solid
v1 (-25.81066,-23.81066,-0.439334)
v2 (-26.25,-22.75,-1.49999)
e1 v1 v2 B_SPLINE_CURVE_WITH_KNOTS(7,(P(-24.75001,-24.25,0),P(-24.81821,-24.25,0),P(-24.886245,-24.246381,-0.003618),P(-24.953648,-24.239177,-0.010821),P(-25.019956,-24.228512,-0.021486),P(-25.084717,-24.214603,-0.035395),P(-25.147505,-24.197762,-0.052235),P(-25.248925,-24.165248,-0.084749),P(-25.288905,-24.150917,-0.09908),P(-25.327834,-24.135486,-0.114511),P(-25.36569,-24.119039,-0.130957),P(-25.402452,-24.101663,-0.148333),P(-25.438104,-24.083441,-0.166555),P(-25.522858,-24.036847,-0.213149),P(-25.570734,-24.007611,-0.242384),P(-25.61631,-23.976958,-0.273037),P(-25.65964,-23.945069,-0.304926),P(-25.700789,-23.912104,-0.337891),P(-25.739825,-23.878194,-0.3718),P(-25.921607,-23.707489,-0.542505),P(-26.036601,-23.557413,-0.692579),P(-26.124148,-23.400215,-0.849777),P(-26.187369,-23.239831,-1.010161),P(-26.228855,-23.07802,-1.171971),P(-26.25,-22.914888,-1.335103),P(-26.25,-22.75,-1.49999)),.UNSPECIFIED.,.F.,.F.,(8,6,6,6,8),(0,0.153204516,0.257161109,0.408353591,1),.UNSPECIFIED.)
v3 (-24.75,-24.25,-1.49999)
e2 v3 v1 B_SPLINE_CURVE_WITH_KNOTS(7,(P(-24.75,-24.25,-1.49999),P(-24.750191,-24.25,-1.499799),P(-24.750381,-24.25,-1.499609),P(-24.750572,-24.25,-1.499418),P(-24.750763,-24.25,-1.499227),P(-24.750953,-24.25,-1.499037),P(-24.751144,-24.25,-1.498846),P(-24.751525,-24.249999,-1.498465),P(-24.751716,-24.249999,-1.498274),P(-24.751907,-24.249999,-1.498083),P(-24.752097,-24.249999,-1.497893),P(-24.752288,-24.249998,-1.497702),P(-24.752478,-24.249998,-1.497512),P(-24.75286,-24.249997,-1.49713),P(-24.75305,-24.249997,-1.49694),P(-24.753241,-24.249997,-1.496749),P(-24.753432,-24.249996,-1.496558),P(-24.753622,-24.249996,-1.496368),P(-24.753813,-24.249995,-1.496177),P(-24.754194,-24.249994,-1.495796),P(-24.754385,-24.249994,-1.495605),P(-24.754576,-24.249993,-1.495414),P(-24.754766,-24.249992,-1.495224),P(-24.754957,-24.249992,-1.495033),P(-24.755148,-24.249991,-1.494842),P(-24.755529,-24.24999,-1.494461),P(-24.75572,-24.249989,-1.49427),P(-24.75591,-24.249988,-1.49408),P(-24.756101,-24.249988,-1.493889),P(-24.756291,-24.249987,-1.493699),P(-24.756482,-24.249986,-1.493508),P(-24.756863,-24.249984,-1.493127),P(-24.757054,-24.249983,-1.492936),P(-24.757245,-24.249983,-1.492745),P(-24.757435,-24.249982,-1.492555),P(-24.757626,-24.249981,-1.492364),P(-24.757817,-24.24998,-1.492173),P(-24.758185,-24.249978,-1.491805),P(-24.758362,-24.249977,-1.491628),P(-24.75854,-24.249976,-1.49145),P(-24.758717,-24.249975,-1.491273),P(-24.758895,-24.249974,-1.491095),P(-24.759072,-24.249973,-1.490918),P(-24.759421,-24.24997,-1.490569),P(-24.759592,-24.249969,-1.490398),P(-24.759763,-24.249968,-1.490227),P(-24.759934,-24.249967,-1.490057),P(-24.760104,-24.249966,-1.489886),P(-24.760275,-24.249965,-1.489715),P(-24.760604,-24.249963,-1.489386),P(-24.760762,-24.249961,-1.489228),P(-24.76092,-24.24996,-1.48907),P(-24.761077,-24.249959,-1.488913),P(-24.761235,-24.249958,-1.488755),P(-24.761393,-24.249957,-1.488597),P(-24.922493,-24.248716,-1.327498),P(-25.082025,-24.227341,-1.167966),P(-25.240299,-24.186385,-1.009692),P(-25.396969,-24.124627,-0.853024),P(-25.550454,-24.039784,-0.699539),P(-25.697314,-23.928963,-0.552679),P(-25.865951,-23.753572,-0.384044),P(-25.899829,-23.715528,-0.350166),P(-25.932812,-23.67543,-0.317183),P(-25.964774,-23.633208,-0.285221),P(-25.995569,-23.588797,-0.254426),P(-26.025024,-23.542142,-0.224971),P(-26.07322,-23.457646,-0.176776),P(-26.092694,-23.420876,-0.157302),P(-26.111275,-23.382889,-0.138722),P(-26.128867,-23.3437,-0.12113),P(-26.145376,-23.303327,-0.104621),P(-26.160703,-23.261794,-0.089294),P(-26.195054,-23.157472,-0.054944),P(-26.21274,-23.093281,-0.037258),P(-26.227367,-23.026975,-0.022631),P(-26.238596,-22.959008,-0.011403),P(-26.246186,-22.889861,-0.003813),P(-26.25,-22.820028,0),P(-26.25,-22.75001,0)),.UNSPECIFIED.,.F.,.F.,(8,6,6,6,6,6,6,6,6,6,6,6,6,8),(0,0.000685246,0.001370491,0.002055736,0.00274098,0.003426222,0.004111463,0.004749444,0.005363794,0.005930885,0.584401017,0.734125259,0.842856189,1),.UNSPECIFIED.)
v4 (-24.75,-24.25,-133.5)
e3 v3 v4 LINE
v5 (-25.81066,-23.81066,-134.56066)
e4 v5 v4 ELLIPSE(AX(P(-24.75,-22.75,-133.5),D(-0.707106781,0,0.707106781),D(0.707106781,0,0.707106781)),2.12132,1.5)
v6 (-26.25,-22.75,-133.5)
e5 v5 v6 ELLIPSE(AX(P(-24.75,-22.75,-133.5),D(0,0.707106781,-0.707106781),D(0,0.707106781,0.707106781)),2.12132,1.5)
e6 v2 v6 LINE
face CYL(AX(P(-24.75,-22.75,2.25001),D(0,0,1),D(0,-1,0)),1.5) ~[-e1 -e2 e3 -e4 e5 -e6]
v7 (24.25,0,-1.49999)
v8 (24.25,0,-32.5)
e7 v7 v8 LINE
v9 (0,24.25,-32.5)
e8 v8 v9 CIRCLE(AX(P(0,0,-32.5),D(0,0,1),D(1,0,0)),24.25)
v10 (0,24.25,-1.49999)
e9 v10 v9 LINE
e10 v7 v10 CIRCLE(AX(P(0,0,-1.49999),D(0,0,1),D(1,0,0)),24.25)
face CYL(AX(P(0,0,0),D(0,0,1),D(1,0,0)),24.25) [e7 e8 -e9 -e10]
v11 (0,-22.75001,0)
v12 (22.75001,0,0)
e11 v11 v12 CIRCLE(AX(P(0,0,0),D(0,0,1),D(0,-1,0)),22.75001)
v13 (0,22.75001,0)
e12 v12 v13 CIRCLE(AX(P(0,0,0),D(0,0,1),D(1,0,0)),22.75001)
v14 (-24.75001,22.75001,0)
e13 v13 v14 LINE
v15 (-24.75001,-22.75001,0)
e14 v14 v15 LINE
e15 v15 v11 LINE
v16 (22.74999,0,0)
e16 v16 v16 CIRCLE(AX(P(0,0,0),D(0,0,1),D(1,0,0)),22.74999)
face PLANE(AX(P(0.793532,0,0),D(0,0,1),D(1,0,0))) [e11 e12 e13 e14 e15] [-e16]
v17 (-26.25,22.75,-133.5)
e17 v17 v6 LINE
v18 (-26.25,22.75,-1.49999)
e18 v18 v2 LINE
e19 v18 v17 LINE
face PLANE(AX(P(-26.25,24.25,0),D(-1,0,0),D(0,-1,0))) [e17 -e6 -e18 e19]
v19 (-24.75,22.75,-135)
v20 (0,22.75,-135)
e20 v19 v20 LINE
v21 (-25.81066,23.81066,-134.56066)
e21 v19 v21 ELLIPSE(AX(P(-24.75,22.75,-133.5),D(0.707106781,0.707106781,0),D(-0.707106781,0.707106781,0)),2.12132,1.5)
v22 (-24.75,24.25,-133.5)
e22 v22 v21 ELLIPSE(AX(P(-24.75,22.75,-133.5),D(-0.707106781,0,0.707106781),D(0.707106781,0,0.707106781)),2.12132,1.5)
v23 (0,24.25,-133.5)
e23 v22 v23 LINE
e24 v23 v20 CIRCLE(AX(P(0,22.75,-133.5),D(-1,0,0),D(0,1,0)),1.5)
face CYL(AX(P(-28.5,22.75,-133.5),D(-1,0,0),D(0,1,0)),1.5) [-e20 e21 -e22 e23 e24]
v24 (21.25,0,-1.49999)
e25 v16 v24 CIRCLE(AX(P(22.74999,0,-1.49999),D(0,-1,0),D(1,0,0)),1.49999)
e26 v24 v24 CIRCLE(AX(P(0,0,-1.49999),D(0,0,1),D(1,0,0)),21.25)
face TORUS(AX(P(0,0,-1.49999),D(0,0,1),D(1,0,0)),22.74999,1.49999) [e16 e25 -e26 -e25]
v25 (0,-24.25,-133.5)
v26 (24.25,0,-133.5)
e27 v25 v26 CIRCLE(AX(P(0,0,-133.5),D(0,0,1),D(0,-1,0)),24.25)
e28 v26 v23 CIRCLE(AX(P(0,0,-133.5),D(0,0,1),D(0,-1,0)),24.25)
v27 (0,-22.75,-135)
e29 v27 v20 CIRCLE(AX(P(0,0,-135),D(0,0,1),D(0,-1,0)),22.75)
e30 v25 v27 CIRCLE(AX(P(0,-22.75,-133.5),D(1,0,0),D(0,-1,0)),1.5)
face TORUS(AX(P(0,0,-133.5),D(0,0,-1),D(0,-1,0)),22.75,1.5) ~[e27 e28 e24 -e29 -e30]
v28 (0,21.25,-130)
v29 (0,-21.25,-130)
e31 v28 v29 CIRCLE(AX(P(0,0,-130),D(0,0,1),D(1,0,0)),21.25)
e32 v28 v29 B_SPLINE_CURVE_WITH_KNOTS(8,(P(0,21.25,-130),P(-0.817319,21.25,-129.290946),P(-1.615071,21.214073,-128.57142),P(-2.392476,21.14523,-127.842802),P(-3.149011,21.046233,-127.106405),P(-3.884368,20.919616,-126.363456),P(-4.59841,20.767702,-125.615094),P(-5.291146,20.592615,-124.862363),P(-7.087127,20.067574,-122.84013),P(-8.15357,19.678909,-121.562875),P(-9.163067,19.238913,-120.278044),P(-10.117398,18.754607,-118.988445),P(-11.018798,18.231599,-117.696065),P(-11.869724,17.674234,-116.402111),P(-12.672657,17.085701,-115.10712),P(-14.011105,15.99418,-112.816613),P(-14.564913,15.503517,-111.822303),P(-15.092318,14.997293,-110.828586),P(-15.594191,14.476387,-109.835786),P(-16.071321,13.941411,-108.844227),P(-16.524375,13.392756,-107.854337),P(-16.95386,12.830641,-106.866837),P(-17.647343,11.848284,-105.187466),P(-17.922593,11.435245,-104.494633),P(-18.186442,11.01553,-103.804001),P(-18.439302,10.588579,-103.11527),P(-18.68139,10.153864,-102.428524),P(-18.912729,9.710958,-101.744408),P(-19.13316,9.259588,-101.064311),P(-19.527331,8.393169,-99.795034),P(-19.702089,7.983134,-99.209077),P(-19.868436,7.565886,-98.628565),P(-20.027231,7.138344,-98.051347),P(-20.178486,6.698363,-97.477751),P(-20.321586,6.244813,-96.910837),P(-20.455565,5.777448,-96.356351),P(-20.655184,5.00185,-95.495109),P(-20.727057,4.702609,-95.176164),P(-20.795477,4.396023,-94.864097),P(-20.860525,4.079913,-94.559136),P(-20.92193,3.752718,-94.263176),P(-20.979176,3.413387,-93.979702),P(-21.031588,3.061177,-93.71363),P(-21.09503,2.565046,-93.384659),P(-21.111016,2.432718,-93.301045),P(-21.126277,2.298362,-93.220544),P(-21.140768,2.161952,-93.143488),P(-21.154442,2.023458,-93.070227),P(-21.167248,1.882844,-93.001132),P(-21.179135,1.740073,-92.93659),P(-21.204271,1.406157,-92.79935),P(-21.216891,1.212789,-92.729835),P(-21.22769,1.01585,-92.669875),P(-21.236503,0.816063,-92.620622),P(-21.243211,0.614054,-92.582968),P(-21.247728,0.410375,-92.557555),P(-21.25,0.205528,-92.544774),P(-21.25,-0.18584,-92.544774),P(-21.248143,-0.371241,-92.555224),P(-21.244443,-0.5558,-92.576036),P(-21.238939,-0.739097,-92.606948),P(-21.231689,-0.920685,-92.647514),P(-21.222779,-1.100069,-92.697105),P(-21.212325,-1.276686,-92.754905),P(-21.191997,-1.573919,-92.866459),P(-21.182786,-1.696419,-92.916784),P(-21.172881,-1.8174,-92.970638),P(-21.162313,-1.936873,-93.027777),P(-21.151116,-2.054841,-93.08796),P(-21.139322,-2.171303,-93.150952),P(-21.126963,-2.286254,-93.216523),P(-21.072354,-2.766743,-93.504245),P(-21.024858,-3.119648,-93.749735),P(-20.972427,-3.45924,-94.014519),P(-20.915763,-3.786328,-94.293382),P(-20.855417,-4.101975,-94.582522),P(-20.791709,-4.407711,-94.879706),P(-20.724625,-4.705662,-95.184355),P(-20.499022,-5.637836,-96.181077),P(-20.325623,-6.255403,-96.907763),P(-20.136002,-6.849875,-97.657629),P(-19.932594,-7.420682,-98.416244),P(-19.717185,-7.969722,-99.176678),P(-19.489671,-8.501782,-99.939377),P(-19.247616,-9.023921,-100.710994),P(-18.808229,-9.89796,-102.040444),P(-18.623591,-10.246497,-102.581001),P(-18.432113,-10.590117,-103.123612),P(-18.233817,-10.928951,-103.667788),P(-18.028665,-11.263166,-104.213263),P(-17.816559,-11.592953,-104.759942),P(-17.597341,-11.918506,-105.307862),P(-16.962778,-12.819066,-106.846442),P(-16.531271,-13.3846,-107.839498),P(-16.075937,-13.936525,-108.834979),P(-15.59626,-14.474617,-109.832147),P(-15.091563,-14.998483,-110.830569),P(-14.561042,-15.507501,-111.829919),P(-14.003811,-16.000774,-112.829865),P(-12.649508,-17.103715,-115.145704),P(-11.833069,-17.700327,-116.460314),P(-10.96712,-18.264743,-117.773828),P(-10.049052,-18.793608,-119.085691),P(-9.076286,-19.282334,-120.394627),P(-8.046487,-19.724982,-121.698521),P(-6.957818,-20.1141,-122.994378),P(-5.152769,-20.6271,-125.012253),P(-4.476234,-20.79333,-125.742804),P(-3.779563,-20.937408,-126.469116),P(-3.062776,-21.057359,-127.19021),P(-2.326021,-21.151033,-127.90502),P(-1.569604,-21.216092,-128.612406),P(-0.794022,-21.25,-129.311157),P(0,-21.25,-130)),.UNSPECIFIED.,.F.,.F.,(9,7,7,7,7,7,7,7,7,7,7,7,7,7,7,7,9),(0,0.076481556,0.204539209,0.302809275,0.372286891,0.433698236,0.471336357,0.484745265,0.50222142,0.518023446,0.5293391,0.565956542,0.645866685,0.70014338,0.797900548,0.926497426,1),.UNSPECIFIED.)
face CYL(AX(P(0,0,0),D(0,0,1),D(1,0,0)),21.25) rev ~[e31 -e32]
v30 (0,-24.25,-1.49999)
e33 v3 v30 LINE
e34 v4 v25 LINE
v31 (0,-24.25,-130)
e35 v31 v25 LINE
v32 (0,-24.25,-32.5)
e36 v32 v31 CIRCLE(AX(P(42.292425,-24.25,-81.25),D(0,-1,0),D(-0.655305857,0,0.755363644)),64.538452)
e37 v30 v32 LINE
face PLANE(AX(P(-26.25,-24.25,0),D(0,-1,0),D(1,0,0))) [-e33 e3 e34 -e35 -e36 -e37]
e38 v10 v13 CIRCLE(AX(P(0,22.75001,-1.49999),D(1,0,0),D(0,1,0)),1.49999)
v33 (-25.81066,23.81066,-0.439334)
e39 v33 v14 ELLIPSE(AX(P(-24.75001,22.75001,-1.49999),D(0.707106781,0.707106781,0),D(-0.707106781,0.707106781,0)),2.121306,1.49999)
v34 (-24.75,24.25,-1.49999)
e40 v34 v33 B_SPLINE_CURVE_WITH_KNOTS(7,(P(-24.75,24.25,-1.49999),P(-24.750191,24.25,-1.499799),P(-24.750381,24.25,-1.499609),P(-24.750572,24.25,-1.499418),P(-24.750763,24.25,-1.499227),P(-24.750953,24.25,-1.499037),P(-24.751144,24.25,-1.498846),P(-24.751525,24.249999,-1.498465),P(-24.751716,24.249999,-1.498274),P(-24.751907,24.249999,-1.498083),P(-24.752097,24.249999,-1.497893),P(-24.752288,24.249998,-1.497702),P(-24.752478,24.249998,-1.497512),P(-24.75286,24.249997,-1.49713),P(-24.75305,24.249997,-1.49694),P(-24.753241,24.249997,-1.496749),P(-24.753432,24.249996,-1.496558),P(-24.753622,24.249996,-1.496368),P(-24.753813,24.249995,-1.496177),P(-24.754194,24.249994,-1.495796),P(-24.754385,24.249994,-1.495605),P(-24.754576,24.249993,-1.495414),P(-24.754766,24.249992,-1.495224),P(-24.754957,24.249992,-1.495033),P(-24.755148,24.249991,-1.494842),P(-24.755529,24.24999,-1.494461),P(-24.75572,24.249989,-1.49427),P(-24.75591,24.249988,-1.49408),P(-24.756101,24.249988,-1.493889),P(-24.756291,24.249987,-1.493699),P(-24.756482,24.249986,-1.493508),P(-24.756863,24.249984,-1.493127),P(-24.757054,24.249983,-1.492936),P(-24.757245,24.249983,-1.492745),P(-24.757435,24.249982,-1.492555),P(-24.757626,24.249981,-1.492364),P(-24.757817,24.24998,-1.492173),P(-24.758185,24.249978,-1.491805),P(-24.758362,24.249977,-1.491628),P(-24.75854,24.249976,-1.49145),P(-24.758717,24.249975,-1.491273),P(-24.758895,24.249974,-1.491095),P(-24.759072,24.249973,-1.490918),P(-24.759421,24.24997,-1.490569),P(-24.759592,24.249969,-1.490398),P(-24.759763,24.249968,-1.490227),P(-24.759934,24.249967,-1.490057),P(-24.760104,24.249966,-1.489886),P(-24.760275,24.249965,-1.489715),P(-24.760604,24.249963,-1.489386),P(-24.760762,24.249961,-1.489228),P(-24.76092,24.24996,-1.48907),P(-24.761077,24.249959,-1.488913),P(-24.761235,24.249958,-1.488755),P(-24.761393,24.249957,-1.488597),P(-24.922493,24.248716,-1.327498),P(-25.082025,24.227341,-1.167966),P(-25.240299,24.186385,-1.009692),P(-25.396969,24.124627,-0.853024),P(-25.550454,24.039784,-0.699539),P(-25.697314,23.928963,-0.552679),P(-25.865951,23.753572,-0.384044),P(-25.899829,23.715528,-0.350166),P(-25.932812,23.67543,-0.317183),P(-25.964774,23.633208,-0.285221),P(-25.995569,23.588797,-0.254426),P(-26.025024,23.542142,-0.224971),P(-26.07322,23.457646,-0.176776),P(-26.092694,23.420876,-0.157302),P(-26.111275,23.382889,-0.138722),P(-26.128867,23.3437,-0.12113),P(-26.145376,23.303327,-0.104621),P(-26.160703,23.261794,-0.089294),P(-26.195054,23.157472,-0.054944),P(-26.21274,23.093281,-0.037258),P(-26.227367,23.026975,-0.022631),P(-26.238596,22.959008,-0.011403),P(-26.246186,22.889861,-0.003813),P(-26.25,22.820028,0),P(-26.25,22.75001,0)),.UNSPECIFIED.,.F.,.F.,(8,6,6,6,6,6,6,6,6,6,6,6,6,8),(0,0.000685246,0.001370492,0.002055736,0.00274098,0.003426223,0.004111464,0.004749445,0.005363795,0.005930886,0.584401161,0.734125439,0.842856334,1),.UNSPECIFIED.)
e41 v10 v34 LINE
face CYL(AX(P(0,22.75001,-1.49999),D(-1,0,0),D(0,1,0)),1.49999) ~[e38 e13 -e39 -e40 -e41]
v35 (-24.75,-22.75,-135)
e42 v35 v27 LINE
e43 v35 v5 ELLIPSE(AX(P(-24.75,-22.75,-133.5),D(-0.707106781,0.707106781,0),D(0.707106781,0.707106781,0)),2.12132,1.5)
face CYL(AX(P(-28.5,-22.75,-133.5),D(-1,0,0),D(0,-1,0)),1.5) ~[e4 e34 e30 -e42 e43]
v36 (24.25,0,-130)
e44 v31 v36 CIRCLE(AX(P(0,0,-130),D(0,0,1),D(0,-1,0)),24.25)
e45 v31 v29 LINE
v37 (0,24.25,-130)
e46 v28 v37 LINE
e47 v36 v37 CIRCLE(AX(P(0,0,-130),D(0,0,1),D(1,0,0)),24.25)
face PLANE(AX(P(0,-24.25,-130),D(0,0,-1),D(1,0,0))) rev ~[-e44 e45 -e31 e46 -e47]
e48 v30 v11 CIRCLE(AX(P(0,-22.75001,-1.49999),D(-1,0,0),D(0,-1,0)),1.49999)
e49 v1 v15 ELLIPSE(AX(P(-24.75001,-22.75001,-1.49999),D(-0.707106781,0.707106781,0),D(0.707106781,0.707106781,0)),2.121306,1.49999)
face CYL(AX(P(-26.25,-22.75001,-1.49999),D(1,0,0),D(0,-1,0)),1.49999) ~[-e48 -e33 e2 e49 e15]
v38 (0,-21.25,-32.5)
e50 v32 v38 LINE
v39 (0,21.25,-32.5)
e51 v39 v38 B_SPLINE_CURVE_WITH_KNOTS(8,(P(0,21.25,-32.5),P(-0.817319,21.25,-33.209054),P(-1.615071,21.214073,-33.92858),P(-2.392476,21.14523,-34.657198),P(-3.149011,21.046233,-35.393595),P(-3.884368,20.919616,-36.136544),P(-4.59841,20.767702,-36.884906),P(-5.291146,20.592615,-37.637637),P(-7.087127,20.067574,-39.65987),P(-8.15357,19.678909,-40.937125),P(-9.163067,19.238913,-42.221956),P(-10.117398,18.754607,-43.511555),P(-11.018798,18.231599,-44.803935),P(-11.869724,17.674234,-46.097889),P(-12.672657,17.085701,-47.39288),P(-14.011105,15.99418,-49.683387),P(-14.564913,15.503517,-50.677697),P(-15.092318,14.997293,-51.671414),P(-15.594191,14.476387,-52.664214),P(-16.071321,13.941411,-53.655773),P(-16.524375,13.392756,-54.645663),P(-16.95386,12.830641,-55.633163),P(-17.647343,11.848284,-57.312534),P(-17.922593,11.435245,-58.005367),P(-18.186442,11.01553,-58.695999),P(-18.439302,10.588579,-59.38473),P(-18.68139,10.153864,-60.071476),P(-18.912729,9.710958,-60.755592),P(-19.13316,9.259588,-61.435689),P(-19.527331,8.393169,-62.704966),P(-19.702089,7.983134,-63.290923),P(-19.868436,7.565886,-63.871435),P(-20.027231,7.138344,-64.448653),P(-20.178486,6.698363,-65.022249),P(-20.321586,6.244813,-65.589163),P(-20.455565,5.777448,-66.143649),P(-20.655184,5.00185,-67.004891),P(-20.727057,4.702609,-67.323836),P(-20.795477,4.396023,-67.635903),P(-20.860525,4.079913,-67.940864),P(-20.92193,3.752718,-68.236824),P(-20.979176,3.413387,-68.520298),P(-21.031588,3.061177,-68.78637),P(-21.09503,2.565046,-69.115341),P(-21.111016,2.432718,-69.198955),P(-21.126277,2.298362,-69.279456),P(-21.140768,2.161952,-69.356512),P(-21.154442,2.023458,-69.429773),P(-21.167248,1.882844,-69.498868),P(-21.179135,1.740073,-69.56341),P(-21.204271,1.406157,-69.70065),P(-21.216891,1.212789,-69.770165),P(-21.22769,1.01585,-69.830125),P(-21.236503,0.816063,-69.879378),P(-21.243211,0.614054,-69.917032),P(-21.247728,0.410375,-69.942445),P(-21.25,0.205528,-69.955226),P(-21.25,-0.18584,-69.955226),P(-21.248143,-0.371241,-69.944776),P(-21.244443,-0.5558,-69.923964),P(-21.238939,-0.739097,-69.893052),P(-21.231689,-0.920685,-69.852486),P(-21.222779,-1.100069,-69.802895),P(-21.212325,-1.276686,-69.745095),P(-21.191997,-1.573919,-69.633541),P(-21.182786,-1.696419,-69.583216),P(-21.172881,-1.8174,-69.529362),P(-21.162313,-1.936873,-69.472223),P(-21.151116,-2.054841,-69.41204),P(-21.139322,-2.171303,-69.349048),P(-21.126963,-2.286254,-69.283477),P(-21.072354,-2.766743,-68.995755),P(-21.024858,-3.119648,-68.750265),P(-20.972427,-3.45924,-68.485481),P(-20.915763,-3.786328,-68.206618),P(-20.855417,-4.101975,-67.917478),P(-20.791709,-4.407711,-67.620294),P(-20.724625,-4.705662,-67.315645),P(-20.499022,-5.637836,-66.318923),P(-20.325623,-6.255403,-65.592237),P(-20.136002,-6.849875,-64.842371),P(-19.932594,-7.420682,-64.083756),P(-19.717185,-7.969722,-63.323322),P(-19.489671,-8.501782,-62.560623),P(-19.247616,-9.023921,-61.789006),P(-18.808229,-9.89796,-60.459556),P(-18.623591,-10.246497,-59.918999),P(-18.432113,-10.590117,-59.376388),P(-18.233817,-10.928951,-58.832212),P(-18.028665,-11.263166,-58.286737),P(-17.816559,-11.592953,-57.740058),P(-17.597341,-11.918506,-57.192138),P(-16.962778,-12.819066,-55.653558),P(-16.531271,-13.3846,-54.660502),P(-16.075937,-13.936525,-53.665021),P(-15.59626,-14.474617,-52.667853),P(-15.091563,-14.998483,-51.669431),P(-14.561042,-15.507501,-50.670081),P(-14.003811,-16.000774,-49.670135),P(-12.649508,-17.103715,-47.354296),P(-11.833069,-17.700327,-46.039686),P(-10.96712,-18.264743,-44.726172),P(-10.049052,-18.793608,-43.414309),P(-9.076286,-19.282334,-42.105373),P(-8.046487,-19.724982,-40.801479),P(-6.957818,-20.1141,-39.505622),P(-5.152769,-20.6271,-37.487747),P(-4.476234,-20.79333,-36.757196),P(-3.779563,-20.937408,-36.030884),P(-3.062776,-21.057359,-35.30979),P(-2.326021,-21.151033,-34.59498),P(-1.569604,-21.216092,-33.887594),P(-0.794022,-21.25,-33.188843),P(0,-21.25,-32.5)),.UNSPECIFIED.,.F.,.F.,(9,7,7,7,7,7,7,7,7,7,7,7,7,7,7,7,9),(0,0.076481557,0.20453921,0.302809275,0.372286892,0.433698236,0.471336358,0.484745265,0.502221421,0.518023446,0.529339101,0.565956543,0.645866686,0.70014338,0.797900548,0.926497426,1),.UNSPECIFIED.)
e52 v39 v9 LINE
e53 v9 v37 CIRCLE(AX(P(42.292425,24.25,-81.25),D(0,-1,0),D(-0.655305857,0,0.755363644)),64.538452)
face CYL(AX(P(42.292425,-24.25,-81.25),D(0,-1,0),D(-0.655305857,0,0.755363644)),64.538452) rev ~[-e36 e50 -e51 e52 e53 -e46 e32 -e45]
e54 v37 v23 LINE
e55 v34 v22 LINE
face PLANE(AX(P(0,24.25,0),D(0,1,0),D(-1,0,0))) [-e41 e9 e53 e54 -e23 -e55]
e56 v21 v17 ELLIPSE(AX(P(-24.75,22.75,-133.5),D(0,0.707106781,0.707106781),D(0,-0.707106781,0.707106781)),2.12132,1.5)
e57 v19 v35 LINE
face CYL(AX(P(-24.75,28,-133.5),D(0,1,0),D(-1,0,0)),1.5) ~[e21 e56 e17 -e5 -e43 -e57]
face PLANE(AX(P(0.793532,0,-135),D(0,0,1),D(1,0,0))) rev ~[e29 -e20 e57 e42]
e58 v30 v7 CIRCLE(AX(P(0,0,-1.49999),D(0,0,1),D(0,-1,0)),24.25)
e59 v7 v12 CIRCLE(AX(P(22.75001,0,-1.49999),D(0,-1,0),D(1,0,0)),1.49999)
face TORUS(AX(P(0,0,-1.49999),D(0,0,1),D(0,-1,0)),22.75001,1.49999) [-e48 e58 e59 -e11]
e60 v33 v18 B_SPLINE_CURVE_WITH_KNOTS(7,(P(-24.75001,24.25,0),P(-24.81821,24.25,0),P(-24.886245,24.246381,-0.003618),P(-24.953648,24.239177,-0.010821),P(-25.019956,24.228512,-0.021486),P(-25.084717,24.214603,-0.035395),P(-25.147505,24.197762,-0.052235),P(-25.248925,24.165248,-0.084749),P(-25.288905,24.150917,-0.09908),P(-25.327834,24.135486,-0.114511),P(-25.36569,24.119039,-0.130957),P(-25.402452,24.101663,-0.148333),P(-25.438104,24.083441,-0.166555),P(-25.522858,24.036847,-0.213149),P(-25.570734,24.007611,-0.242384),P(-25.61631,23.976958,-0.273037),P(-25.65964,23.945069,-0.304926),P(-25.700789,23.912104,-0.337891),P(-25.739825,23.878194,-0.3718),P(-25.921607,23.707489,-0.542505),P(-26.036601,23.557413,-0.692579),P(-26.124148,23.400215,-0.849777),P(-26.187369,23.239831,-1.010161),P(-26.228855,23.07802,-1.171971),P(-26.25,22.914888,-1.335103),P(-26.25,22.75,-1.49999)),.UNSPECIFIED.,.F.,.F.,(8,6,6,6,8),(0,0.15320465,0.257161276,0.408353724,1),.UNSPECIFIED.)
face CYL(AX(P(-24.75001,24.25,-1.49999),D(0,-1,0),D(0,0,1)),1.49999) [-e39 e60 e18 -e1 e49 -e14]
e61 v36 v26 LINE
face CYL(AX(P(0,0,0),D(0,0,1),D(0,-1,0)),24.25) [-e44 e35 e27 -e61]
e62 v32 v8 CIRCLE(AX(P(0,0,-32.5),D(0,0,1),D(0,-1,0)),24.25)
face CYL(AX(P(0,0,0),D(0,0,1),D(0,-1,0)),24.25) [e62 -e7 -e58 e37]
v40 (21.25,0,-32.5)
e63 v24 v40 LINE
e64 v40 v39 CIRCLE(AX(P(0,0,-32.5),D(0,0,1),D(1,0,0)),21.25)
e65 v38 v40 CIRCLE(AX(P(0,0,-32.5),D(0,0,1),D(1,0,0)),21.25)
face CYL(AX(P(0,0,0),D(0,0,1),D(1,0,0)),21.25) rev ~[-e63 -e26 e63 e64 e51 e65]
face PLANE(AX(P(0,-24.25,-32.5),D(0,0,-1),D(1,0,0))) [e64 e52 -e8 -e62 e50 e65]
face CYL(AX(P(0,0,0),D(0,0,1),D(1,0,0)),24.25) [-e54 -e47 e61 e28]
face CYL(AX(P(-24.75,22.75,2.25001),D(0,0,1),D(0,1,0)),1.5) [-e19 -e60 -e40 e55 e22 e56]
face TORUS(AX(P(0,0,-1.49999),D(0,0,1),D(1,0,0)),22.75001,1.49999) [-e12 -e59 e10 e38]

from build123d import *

# Parameters (mm, degrees)
F1_DEPTH      = 135
F2_R          = 21.25
F3_DEPTH      = 130
F4_W          = 24.25
F4_H          = 97.5
F5_DEPTH      = 50.1
F5_DEPTH_BACK = 25
F6_R          = 1.49999
F7_T3_DEPTH   = 141.00001
F7_T6_DEPTH   = 56
F7_T9_DEPTH   = 141.00001
F8_T1_DEPTH   = 28.5
F8_T4_ANGLE   = 180


# Not quite as in the source:
# - a fillet or chamfer that OpenCascade refuses, or shapes differently, is made with other operations: its cross-section is extruded or revolved along the edge and cut away or added
# - a fillet or chamfer is up to 0.001 mm smaller than in the source, because OpenCascade refuses the exact size


with BuildPart() as f1:
    # F0 (on Top) → F1 (new body)
    with BuildSketch(Plane.XY):
        with BuildLine():
            ThreePointArc((0, -24.25), (17.1473394438, -17.1473394438), (24.25, 0))
            ThreePointArc((24.25, 0), (17.1473394438, 17.1473394438), (0, 24.25))
            ThreePointArc((0, 24.25), (-24.25, 0), (0, -24.25))
        make_face()
        with BuildLine():
            ThreePointArc((0, -24.25), (-24.25, 0), (0, 24.25))
            Line((0, 24.25), (-26.25, 24.25))
            Line((-26.25, 24.25), (-26.25, -24.25))
            Line((-26.25, -24.25), (0, -24.25))
        make_face()
    extrude(amount=-F1_DEPTH)

    # F2 (on face) → F3 (cut)
    with BuildSketch(Plane.XY):
        Circle(F2_R)
    extrude(amount=-F3_DEPTH, mode=Mode.SUBTRACT)

    # F4 (on face) → F5 (cut, two sides)
    with BuildSketch(Plane.XZ.offset(24.25)) as f5_sk:
        with Locations((12.125, -81.25)):
            Rectangle(F4_W, F4_H)
        with BuildLine():
            Line((0, -130), (0, -32.5))
            ThreePointArc((0, -32.5), (-22.2460263089, -81.25), (0, -130))
        make_face()
    extrude(amount=-F5_DEPTH, mode=Mode.SUBTRACT)
    extrude(f5_sk.sketch, amount=F5_DEPTH_BACK, mode=Mode.SUBTRACT)

    # F6 (radius 1.5 in the source; OpenCascade refuses exactly that, so slightly less here)
    f6_edges = [f1.edges().sort_by_distance(p)[0] for p in [
        (24.25, 0, 0),
        (-13.125, -24.25, 0),
        (-13.125, 24.25, 0),
        (-26.25, 0, 0),
        (-21.25, 0, 0),
    ]]
    fillet(f6_edges, radius=F6_R)

    # F7: fillet of radius 1.5 on 4 edges, made by hand


with BuildPart() as f7_tool1:
    # F7_s2 → F7_t3 (new body)
    with BuildSketch(Plane.XY.offset(2.25001)):
        with BuildLine():
            ThreePointArc((-24.75, 24.25), (-25.8106601718, 23.8106601718), (-26.25, 22.75))
            Line((-26.25, 22.75), (-26.25, 24.25))
            Line((-26.25, 24.25), (-24.75, 24.25))
        make_face()
    extrude(amount=-F7_T3_DEPTH)


with BuildPart() as f7_tool4:
    # F7_s5 → F7_t6 (new body)
    with BuildSketch(Plane.XZ.offset(-28)):
        with BuildLine():
            ThreePointArc((-26.25, -133.5), (-25.8106601718, -134.5606601718), (-24.75, -135))
            Line((-24.75, -135), (-26.25, -135))
            Line((-26.25, -135), (-26.25, -133.5))
        make_face()
    extrude(amount=F7_T6_DEPTH)


with BuildPart() as f7_tool7:
    # F7_s8 → F7_t9 (new body)
    with BuildSketch(Plane.XY.offset(2.25001)):
        with BuildLine():
            ThreePointArc((-24.75, -24.25), (-25.8106601718, -23.8106601718), (-26.25, -22.75))
            Line((-26.25, -22.75), (-26.25, -24.25))
            Line((-26.25, -24.25), (-24.75, -24.25))
        make_face()
    extrude(amount=-F7_T9_DEPTH)


with BuildPart() as f1_1:
    add(f1.part)

    # F7_t10: cut F7_tool1, F7_tool4, F7_tool7
    add([f7_tool1.part, f7_tool4.part, f7_tool7.part], mode=Mode.SUBTRACT)

    # F8: fillet of radius 1.5 on 4 edges, made by hand

    # F8_s2 → F8_t1 (cut)
    with BuildSketch(Plane.YZ.offset(-28.5)):
        with BuildLine():
            ThreePointArc((-24.25, -133.5), (-23.8106601718, -134.5606601718), (-22.75, -135))
            Line((-22.75, -135), (-24.25, -135))
            Line((-24.25, -135), (-24.25, -133.5))
        make_face()
        with BuildLine():
            ThreePointArc((24.25, -133.5), (23.8106601718, -134.5606601718), (22.75, -135))
            Line((22.75, -135), (24.25, -135))
            Line((24.25, -135), (24.25, -133.5))
        make_face()
    extrude(amount=F8_T1_DEPTH, mode=Mode.SUBTRACT)

    # F8_s3 → F8_t4 (revolve, cut)
    with BuildSketch(Plane.YZ):
        with BuildLine():
            ThreePointArc((-24.25, -133.5), (-23.8106601718, -134.5606601718), (-22.75, -135))
            Line((-22.75, -135), (-24.25, -135))
            Line((-24.25, -135), (-24.25, -133.5))
        make_face()
    revolve(axis=Axis((0, 0, -135), (0, 0, 1)), revolution_arc=F8_T4_ANGLE, mode=Mode.SUBTRACT)


solid = f1_1.part
